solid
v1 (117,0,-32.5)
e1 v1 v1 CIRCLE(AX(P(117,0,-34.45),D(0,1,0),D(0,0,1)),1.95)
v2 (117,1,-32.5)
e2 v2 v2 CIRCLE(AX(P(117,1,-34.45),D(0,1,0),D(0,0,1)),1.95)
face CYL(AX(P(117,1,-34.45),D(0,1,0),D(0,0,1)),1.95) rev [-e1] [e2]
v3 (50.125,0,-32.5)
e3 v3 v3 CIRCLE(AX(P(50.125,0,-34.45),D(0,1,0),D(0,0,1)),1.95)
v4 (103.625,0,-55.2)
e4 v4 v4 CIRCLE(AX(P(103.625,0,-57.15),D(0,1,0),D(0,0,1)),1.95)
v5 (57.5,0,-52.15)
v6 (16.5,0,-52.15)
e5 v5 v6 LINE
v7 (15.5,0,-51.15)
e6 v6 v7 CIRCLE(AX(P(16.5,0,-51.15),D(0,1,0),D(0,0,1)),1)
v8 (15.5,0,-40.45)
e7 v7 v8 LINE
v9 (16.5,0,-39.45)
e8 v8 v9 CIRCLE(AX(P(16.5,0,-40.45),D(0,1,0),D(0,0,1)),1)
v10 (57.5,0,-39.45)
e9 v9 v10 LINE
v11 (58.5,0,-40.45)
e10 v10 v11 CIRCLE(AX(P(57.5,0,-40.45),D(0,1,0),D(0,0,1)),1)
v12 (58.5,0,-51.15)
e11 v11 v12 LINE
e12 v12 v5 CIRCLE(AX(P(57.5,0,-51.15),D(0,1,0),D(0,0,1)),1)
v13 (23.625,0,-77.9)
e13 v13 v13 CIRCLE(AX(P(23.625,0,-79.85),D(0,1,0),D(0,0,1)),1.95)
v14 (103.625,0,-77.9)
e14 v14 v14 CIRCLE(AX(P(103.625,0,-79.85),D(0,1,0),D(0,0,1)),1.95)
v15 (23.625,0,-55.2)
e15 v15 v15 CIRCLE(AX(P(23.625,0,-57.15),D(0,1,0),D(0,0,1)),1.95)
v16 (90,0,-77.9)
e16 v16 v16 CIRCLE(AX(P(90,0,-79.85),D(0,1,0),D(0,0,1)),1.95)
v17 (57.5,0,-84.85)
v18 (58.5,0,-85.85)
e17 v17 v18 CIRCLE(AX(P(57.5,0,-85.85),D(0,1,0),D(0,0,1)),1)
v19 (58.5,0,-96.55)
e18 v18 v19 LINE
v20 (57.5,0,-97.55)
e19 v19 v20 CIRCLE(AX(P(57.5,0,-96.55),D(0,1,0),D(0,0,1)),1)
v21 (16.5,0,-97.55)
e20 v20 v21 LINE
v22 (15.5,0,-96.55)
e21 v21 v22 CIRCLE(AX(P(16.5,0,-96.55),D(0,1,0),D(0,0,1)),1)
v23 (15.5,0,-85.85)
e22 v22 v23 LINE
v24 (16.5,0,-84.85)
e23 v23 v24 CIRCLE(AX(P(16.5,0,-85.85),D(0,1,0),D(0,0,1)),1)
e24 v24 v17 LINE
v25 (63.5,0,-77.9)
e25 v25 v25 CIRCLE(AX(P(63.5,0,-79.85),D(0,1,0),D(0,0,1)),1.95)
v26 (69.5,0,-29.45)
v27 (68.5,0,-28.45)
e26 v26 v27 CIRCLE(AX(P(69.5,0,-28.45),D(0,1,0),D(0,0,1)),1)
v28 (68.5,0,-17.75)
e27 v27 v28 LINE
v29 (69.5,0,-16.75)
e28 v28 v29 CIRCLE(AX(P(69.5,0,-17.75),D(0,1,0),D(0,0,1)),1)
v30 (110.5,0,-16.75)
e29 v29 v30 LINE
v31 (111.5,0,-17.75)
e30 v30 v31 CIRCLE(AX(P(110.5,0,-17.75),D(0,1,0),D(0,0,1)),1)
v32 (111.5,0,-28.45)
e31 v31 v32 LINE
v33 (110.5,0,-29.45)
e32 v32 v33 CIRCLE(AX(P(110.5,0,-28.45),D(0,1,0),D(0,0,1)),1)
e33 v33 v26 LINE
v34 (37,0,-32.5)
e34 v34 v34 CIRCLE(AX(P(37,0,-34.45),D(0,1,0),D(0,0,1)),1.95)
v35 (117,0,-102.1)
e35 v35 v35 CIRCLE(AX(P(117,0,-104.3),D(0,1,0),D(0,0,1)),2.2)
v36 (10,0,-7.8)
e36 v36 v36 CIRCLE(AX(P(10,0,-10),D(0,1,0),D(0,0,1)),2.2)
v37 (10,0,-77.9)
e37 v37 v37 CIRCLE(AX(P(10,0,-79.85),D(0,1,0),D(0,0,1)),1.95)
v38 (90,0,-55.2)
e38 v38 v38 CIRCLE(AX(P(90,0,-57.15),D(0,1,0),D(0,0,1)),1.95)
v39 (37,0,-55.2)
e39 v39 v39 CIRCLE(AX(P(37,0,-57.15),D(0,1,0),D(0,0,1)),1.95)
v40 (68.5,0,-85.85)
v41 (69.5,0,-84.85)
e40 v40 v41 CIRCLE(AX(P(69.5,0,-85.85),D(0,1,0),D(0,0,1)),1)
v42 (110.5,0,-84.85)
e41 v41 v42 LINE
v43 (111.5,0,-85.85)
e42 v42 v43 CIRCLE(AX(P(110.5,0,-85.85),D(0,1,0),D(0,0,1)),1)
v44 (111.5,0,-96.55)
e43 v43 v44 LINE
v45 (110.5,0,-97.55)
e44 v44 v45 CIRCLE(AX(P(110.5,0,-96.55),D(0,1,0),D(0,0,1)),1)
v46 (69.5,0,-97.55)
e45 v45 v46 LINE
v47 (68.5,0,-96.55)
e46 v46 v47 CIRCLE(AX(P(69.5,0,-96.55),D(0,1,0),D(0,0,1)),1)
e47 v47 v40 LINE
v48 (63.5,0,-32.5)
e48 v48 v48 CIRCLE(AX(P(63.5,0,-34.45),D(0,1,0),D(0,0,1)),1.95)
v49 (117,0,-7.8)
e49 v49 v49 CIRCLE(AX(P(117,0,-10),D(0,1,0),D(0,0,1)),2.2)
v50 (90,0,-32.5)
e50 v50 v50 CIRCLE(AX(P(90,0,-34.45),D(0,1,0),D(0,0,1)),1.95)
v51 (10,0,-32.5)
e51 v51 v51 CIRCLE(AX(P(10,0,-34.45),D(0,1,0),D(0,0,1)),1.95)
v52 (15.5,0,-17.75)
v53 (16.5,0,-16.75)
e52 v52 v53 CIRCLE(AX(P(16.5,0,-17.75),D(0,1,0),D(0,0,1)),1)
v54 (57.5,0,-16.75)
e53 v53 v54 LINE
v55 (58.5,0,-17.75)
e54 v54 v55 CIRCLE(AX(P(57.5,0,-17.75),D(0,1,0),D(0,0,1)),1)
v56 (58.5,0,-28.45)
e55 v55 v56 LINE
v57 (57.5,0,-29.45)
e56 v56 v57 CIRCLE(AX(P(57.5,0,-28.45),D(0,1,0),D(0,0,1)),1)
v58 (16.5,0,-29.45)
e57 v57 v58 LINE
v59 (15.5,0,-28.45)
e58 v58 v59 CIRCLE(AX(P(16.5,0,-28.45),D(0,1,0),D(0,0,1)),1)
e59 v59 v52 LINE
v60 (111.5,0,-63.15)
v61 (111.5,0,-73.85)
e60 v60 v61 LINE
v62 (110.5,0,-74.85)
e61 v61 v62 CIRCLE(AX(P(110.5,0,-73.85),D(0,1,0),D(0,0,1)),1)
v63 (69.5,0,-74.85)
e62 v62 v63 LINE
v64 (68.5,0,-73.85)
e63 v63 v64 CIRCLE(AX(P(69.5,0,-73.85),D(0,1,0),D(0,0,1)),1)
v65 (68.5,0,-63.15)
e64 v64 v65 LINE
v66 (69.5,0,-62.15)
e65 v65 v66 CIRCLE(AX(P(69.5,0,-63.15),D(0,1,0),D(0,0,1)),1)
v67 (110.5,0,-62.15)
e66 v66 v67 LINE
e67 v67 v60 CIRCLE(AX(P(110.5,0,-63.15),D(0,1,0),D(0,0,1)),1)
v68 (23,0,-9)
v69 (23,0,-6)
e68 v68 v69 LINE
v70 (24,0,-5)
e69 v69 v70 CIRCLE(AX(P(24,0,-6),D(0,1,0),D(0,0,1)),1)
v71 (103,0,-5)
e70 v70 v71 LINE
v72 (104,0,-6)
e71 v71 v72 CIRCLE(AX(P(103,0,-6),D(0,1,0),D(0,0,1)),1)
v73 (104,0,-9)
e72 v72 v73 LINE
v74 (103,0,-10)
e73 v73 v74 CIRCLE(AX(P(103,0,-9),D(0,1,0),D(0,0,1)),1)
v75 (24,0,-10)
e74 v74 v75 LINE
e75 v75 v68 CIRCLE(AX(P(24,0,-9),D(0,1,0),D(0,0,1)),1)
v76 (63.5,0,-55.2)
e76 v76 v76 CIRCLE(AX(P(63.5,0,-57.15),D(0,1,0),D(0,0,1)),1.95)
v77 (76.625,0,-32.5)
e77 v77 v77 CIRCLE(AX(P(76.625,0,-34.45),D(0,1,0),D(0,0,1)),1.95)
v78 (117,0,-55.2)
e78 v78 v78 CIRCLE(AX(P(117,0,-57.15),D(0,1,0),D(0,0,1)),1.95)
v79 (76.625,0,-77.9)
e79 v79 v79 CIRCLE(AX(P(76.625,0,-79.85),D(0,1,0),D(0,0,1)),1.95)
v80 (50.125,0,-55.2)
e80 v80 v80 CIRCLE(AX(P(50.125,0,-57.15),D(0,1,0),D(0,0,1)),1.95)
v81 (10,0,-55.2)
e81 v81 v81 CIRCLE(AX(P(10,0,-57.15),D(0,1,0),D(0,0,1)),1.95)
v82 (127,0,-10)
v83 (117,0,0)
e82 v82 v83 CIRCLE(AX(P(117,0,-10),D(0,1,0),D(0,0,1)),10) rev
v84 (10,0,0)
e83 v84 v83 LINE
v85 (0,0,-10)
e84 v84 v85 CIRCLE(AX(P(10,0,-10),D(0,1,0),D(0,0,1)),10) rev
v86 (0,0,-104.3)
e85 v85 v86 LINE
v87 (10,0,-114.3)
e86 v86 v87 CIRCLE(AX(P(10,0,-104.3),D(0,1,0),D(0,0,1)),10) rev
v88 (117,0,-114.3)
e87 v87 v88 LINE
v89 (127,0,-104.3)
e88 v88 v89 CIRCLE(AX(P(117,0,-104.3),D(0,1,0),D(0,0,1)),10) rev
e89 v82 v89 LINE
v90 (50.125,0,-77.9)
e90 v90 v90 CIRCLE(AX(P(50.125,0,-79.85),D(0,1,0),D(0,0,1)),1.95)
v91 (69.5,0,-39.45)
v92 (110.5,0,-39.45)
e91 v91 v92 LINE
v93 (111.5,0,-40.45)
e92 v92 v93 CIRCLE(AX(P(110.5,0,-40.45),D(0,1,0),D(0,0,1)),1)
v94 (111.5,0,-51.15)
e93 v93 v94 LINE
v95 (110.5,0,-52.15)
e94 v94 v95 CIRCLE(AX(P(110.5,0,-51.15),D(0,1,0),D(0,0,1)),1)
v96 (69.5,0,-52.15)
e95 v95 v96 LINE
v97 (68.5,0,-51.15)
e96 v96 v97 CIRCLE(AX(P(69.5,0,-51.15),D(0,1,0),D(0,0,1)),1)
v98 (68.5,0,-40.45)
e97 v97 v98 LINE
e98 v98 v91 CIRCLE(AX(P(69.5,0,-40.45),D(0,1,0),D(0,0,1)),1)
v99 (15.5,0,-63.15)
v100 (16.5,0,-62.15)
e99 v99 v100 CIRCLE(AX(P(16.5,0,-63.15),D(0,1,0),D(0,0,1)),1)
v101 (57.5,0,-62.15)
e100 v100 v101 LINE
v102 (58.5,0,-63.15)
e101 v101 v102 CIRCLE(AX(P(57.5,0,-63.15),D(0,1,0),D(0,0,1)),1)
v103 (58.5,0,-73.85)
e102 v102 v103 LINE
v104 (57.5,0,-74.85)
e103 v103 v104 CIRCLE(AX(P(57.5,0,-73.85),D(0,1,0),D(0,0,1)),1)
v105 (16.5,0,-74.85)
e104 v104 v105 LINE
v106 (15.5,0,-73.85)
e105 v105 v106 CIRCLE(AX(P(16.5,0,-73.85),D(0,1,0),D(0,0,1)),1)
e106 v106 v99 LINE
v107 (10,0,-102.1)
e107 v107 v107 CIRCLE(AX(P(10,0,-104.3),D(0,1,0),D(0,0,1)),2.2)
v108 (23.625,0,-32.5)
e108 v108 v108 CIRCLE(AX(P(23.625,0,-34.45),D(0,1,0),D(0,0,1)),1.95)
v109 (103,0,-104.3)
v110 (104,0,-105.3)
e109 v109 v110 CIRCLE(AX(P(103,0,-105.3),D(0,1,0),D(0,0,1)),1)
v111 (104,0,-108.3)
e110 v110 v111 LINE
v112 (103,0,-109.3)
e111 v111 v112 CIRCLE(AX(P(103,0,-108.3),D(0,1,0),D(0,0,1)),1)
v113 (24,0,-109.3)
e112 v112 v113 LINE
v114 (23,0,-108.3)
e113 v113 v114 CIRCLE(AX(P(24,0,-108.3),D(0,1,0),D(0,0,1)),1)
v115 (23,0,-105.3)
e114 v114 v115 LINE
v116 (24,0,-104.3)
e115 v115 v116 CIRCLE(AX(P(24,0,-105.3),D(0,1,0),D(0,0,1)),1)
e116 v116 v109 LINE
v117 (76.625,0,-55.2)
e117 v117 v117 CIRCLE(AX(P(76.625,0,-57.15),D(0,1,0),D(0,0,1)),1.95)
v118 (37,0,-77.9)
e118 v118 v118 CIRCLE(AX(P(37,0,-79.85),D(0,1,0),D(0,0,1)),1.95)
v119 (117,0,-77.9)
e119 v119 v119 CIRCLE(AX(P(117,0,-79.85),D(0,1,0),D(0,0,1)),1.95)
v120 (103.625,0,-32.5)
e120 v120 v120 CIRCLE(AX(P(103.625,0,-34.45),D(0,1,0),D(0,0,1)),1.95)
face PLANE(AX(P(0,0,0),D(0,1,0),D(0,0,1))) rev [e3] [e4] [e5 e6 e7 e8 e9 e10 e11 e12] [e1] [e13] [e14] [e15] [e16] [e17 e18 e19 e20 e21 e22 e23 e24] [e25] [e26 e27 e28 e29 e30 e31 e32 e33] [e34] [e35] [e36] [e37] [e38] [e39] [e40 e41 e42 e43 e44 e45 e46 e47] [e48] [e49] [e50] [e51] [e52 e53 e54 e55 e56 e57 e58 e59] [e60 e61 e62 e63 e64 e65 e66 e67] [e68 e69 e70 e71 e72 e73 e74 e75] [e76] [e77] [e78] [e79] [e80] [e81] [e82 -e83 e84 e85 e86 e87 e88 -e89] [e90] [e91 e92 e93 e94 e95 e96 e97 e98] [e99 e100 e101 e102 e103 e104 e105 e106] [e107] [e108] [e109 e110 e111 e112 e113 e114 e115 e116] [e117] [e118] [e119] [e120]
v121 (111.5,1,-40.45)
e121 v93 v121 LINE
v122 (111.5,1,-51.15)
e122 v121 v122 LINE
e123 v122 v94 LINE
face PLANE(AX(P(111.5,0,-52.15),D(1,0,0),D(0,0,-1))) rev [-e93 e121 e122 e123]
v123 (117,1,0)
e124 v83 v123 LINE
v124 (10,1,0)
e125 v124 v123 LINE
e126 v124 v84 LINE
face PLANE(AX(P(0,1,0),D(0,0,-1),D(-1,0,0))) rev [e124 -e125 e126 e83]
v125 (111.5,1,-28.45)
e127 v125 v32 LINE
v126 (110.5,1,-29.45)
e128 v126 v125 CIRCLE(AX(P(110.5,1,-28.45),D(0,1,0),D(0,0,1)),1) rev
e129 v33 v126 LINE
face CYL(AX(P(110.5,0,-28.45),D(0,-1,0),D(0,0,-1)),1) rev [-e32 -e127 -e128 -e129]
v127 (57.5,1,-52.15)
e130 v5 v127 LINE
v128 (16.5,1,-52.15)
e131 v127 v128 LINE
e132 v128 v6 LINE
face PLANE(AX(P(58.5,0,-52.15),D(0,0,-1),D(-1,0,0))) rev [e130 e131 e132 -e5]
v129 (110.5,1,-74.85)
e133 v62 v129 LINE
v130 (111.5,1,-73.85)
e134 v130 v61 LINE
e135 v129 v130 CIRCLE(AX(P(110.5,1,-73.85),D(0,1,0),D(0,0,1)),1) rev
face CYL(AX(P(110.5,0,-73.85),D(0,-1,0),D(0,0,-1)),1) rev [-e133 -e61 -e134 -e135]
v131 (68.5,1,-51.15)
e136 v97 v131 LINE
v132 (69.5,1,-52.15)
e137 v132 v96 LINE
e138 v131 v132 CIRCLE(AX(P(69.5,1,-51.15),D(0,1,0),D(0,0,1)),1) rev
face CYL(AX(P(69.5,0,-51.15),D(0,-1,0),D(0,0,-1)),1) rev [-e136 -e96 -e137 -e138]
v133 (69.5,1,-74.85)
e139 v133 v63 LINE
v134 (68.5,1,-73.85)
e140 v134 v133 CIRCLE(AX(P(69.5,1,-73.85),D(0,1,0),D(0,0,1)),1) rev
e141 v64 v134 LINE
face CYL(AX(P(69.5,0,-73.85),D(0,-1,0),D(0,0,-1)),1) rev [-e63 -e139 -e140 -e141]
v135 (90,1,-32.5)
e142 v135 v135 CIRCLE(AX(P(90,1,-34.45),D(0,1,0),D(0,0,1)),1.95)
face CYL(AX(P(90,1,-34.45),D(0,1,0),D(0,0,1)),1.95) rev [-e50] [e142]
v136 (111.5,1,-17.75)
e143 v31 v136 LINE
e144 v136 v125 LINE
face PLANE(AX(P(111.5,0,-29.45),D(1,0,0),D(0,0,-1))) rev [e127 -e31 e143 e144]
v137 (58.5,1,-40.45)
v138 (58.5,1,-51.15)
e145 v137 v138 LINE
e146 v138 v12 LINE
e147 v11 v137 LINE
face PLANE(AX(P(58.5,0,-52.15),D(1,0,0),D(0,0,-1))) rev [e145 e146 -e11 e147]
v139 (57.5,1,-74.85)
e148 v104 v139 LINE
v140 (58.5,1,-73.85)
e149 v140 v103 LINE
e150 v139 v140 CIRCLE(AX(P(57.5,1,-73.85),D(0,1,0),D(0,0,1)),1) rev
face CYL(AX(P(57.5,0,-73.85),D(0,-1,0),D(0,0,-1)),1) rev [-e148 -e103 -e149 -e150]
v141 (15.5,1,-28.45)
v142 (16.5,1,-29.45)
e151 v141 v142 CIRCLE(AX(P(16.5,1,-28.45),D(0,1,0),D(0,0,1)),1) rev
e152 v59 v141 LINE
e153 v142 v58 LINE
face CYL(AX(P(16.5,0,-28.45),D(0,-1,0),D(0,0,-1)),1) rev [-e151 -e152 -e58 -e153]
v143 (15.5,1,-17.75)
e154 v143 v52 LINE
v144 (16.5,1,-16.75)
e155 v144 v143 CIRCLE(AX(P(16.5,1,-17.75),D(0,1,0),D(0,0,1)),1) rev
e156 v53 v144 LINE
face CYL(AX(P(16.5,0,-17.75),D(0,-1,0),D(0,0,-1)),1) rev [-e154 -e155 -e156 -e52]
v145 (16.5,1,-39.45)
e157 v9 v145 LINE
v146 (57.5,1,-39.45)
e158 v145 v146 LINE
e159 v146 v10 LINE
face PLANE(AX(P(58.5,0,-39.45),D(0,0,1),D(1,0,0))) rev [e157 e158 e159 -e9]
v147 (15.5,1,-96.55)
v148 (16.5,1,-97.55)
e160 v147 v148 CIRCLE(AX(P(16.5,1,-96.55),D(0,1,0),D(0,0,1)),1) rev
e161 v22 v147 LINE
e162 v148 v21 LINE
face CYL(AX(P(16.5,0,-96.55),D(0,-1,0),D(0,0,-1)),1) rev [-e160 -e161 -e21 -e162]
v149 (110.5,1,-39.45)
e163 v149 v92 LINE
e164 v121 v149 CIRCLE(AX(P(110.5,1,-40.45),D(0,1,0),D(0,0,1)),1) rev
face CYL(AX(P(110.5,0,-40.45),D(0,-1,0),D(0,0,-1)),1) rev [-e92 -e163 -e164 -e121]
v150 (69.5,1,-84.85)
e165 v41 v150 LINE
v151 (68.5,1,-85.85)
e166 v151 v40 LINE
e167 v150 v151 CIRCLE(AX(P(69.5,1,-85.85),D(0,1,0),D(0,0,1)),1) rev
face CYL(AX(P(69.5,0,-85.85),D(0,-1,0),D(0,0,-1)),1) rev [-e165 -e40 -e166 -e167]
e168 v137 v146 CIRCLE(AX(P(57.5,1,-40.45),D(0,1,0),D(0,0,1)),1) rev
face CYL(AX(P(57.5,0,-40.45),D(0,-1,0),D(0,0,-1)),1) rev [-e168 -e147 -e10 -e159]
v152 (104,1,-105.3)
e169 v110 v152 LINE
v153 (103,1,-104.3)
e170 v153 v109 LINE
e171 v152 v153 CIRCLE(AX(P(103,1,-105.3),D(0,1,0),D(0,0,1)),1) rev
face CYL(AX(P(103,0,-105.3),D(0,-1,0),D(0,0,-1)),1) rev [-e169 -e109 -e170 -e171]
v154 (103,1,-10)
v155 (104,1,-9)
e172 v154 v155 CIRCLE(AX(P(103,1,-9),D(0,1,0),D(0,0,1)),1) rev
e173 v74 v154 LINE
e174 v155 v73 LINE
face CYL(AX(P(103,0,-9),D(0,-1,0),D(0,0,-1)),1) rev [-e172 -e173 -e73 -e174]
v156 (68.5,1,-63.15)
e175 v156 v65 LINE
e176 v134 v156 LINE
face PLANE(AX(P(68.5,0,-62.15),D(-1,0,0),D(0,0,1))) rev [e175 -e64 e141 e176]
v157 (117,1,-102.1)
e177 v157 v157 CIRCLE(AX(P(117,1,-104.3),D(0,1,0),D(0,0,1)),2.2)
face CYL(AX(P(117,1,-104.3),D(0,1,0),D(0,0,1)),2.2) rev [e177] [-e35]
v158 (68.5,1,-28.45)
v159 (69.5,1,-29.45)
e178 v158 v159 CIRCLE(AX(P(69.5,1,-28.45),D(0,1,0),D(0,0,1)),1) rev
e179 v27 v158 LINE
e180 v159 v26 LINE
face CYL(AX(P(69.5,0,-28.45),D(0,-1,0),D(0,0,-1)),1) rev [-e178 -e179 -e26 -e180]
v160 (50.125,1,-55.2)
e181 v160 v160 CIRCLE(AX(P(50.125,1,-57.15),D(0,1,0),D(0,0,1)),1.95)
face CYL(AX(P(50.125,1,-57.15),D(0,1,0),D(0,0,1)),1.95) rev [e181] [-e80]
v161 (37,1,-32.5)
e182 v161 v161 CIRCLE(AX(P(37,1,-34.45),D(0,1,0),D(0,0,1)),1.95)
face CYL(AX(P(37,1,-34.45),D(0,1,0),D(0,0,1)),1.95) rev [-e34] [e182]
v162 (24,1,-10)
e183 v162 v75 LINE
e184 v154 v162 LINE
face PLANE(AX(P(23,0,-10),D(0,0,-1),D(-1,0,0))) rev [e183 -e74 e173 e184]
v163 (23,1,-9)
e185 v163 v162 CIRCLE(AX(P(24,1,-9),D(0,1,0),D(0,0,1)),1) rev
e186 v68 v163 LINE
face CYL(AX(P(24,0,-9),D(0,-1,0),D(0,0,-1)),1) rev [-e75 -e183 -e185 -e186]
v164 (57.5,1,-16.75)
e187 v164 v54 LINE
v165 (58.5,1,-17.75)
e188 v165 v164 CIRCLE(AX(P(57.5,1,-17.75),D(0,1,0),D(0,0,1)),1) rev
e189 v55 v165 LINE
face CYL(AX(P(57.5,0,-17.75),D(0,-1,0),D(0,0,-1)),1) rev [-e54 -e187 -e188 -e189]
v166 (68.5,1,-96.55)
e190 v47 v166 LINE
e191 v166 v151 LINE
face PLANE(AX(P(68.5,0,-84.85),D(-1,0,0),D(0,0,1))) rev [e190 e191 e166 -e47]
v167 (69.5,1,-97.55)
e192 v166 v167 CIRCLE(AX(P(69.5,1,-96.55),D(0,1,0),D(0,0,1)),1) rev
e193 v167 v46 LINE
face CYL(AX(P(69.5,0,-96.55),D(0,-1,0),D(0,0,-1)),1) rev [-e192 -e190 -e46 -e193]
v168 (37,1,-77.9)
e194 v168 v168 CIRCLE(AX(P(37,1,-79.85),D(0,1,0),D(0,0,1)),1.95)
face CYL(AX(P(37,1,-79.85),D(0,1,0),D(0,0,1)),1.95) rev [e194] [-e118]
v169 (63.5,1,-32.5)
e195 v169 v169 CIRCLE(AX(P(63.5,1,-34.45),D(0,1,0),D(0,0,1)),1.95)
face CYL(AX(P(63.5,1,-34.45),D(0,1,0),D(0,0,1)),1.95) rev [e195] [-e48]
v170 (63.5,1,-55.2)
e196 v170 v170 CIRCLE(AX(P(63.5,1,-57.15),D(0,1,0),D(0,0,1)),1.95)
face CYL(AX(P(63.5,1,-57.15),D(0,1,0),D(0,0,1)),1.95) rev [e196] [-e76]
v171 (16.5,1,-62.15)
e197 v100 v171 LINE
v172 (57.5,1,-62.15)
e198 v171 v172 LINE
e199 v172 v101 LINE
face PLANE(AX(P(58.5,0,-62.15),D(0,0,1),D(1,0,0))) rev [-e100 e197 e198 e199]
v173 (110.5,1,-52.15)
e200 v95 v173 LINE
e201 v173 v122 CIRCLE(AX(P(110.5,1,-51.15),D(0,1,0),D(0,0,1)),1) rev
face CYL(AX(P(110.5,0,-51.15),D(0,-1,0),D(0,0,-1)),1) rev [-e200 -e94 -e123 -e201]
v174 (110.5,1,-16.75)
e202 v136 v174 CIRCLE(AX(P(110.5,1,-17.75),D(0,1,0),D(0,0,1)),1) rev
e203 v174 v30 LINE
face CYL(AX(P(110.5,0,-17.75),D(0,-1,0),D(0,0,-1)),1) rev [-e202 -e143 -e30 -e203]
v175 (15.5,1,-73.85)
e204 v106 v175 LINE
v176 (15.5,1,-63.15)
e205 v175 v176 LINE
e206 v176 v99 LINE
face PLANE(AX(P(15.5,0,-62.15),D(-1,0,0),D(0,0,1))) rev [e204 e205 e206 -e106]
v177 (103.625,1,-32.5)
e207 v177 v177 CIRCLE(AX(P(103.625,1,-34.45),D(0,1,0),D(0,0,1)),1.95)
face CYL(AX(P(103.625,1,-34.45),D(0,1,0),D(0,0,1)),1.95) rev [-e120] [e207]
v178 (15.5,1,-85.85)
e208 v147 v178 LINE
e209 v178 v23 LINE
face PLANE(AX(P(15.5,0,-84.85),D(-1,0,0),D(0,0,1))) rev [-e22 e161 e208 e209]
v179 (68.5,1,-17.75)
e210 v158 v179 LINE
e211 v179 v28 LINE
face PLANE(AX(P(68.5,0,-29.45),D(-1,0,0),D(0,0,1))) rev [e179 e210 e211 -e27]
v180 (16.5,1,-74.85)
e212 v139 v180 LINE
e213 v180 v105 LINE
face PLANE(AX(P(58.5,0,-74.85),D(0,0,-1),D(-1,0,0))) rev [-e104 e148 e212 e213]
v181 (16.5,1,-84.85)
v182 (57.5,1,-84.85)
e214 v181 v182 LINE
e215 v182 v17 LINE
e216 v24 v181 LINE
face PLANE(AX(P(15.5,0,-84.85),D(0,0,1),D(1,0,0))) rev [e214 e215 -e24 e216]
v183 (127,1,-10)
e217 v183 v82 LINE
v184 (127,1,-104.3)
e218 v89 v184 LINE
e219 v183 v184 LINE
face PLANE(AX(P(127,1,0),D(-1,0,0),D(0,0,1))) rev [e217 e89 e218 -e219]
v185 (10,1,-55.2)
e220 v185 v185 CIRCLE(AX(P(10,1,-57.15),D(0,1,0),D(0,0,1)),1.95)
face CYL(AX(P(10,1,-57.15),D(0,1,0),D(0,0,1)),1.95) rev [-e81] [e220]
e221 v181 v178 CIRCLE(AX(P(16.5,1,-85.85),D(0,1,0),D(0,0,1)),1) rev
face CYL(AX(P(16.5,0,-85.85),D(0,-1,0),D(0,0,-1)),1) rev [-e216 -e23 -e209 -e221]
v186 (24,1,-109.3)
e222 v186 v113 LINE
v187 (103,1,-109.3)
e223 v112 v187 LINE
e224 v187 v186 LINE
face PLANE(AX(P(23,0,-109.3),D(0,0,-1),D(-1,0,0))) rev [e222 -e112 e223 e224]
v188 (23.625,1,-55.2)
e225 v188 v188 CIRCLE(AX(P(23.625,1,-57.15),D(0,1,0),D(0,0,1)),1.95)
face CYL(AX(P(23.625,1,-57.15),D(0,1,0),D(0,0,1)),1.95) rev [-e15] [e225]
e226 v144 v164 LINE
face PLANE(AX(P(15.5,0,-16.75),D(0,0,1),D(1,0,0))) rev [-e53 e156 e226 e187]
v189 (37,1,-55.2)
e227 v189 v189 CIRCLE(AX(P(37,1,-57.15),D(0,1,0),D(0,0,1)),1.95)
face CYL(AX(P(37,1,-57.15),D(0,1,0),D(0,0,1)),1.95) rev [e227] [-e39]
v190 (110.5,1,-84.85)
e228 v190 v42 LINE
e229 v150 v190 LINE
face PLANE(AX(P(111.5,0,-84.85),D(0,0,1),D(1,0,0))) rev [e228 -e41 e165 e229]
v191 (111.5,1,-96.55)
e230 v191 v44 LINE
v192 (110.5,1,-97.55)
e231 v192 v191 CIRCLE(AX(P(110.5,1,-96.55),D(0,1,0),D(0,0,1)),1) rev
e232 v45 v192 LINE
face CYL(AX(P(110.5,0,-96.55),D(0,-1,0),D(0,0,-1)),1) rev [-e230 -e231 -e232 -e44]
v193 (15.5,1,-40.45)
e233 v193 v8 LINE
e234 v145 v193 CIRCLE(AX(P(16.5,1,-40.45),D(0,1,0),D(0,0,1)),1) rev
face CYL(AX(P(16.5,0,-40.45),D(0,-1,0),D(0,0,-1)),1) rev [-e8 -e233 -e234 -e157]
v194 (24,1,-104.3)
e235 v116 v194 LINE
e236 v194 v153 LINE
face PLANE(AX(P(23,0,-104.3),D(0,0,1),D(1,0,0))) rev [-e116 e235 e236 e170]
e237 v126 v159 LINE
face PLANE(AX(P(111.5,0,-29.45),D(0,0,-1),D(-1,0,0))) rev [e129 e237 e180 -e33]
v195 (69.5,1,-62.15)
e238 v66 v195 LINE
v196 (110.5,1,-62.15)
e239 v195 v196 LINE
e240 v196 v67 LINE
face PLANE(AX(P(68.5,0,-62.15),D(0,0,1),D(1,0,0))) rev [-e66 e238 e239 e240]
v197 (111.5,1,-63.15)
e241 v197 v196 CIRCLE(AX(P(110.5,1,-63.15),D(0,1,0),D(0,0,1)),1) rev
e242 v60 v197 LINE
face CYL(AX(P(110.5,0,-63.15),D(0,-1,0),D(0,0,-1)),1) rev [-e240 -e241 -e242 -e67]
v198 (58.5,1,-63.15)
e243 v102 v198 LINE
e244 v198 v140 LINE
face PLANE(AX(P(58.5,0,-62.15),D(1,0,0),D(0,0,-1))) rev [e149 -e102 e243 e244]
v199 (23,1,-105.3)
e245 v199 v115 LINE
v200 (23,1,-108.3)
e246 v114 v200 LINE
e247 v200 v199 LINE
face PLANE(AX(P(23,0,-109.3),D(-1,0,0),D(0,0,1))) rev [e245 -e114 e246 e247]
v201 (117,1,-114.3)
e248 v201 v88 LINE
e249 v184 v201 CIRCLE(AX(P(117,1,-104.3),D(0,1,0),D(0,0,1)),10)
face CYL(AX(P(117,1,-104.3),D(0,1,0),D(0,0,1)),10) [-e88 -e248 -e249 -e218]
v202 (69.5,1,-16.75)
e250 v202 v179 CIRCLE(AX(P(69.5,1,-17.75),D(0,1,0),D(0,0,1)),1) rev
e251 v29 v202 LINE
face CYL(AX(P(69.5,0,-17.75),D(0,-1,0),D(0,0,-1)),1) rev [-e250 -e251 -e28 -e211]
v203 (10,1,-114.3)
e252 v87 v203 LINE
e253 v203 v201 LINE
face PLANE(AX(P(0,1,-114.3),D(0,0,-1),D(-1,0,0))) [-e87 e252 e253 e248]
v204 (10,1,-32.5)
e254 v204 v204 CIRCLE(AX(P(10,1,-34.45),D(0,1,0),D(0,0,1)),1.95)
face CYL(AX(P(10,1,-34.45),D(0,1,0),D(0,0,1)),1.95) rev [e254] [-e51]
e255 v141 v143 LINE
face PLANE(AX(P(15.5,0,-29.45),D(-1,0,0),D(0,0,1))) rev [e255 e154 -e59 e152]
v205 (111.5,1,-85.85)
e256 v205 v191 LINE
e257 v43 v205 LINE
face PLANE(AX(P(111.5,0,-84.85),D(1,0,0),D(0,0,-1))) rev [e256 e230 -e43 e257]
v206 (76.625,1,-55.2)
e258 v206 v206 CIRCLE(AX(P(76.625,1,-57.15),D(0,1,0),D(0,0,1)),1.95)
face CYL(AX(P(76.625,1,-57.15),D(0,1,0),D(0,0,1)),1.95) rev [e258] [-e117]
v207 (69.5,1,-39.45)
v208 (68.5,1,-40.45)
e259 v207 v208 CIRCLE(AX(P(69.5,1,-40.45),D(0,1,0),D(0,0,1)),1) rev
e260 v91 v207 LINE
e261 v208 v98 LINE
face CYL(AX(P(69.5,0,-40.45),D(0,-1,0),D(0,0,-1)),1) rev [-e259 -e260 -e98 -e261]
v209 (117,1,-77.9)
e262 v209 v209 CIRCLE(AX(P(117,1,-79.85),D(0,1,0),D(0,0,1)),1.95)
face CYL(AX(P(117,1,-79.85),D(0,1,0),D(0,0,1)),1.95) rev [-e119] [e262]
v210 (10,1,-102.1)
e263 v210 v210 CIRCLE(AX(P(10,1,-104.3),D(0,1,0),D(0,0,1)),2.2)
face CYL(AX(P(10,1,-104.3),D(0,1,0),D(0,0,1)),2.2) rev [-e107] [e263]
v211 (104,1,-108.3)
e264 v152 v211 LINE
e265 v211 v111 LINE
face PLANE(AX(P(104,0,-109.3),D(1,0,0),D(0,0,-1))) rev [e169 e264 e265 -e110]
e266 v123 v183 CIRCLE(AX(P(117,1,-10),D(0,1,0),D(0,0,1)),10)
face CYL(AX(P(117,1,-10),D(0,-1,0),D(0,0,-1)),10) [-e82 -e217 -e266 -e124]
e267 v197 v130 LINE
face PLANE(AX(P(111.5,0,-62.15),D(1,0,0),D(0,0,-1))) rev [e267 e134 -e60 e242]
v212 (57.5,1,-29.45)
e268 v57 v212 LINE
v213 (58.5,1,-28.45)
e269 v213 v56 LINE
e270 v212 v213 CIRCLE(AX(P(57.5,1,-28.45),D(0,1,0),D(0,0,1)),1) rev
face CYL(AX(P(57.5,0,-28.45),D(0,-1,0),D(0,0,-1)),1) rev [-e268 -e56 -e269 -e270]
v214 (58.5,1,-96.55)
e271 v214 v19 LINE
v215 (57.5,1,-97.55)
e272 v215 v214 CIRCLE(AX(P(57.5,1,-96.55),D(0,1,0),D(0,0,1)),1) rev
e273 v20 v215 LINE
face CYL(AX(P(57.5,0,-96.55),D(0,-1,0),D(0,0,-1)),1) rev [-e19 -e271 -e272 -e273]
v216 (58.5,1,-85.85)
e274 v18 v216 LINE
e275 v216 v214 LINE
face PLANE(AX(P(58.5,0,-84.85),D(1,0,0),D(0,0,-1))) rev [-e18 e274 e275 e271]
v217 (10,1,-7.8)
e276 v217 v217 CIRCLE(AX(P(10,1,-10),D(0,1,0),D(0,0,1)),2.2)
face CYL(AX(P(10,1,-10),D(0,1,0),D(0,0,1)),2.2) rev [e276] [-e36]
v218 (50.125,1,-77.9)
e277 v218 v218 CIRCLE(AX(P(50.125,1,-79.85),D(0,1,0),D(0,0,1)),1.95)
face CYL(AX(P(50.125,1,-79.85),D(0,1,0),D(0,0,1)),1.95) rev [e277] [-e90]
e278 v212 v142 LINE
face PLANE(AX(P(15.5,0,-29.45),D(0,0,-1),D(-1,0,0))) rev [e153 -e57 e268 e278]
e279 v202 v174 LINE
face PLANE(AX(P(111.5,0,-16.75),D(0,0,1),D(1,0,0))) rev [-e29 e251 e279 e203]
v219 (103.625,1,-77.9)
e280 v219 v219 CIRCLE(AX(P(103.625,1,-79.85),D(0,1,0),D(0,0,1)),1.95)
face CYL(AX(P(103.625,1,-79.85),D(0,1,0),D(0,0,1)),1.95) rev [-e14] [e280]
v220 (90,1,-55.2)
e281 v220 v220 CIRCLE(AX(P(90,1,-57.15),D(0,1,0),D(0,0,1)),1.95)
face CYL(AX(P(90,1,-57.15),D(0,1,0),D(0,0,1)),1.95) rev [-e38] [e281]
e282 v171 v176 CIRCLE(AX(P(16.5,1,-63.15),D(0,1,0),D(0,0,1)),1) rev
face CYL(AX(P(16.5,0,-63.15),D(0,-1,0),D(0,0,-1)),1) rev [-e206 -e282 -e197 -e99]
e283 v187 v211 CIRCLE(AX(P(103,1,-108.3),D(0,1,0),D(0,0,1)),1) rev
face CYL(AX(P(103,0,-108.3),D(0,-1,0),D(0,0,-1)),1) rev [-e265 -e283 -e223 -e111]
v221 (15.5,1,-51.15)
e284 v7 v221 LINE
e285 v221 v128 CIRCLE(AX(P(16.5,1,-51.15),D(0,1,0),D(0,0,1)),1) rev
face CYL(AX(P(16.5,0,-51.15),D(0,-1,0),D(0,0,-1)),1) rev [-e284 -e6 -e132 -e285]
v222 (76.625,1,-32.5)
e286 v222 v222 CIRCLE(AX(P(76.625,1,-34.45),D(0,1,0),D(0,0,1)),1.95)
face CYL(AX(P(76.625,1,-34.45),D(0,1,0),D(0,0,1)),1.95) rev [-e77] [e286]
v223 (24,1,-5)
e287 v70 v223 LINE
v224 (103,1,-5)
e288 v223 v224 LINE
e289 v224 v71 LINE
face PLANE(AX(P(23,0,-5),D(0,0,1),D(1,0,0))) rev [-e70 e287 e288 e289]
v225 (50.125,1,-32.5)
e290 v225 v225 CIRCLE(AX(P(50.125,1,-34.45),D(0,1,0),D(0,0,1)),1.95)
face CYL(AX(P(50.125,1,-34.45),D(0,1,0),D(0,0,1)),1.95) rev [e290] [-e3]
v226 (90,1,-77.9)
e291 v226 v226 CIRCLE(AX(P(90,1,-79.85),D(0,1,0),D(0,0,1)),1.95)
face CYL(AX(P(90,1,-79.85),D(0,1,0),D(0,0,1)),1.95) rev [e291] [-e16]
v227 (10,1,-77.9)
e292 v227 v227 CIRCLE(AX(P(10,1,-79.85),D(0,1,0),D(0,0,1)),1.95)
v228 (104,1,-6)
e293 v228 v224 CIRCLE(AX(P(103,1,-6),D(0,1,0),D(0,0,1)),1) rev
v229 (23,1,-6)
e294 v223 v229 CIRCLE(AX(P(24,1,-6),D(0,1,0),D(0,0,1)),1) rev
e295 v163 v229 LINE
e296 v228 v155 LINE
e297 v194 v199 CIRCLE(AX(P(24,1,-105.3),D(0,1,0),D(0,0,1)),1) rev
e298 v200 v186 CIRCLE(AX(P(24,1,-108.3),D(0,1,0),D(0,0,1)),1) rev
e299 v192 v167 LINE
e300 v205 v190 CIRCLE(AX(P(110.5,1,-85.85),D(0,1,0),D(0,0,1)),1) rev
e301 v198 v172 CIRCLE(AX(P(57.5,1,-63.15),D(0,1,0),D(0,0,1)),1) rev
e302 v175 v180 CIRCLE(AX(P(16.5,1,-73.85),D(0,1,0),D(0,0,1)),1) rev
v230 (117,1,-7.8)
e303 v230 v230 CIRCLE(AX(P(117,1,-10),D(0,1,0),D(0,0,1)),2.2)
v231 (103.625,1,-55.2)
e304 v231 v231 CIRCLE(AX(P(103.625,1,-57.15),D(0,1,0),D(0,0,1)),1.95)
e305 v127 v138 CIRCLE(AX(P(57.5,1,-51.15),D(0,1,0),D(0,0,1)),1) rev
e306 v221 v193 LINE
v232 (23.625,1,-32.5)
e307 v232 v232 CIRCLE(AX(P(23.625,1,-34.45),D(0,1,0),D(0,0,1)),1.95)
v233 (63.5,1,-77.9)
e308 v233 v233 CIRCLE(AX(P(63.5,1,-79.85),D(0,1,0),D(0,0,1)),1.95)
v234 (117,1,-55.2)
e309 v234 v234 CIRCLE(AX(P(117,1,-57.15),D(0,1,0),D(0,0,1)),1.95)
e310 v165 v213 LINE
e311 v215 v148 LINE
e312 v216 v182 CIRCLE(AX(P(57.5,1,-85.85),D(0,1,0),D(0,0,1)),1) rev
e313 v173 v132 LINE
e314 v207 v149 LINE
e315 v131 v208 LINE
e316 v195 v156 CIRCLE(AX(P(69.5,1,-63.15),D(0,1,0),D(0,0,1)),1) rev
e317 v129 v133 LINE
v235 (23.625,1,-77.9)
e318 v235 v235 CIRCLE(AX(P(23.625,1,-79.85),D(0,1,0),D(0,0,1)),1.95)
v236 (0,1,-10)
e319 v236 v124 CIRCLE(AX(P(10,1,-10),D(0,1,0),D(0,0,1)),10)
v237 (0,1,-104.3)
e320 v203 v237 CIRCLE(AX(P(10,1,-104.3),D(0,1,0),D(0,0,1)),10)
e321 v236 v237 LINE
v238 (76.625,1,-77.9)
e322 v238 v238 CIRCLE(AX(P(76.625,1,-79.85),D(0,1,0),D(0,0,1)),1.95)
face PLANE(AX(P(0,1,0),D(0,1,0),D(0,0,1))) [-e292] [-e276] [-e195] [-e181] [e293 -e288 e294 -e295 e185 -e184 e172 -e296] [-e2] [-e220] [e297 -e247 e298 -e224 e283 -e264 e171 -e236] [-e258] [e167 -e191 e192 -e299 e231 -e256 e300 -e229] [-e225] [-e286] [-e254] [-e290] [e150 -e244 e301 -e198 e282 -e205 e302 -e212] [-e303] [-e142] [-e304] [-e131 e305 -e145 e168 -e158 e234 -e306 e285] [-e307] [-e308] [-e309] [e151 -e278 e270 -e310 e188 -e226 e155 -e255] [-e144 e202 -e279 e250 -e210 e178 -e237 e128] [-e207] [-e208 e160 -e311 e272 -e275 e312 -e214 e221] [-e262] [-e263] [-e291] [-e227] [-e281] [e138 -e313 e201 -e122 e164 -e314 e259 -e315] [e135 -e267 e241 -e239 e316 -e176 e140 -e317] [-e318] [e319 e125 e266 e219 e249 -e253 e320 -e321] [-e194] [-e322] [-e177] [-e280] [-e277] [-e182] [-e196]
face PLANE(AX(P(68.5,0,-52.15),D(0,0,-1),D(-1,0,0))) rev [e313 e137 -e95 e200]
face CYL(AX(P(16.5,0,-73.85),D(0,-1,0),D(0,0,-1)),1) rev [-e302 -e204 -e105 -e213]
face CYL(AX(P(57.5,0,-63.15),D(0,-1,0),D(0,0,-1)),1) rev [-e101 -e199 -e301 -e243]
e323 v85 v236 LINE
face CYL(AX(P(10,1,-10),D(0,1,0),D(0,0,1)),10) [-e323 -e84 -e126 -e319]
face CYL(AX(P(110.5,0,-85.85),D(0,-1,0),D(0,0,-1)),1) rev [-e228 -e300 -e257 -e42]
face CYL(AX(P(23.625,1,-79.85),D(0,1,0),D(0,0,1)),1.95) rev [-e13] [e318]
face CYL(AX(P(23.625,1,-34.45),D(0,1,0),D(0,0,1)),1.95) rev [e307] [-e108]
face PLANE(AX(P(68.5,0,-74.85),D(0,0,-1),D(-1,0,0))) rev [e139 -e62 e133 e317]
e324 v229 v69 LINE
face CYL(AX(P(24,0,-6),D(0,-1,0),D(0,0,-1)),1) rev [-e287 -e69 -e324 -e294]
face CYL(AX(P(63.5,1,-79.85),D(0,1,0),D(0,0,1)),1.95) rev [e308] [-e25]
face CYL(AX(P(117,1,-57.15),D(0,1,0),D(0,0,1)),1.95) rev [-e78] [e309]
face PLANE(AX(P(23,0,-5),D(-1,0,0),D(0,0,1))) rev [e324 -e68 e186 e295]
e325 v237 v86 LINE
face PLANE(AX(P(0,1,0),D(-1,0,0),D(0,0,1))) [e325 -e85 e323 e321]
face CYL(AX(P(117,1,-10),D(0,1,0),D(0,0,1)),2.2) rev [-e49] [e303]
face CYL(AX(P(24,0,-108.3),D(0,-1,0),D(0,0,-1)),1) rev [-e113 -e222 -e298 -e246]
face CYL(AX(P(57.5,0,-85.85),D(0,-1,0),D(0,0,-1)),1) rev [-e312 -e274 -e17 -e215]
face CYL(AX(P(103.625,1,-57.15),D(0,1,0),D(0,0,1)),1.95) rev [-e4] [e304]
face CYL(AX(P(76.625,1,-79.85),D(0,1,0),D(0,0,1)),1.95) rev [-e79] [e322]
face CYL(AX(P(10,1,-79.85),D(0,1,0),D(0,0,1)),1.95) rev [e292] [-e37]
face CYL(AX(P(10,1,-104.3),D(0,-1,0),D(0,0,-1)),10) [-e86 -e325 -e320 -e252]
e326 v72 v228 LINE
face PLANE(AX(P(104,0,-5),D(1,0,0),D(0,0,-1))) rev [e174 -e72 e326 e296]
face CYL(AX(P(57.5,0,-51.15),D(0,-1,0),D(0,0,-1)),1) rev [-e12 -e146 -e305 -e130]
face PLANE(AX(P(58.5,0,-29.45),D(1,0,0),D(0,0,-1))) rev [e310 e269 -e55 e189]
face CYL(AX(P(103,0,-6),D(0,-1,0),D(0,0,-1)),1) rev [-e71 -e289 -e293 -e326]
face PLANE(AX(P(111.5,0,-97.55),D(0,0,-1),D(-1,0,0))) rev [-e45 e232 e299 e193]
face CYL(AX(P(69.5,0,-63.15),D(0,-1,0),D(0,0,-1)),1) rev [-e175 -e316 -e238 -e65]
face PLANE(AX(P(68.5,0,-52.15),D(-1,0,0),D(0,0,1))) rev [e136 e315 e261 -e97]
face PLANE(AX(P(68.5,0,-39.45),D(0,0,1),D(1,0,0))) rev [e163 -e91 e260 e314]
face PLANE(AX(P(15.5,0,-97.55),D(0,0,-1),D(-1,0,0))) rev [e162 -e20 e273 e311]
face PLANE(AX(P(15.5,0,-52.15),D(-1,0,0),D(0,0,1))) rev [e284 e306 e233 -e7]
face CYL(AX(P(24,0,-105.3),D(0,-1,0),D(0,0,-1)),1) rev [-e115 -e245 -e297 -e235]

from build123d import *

# Parameters (mm, degrees)
SKETCH2_W                          = 127
SKETCH2_H                          = 114.3
BOSS_EXTRUDE1_DEPTH                = 1
FILLET1_R                          = 10
F_4_4_4_4_DIAMETER_HOLE1_D         = 4.4
CUT_EXTRUDE1_DEPTH                 = 171.863951728
CUT_EXTRUDE1_DEPTH_BACK            = 171.863951728
SKETCH5_W                          = 43
SKETCH5_H                          = 12.7
CUT_EXTRUDE2_DEPTH                 = 171.863951728
CUT_EXTRUDE2_DEPTH_BACK            = 171.863951728
SKETCH6_W                          = 81
SKETCH6_H                          = 5
F_3_9_3_9_DIAMETER_HOLE1_OUTLINE_R = 1.95
F_3_9_3_9_DIAMETER_HOLE1_DEPTH     = 1
FILLET2_R                          = 1


# Read off the part's stored shape, not the designer's step: Ø3.9 (3.9) Diameter Hole1
with BuildPart() as part:
    # Sketch2 → Boss-Extrude1 (new body)
    with BuildSketch(Plane(origin=(0, 0, 0), x_dir=(1, 0, 0), z_dir=(0, 1, 0))):
        with Locations((63.5, 57.15)):
            Rectangle(SKETCH2_W, SKETCH2_H)
    extrude(amount=BOSS_EXTRUDE1_DEPTH)

    # Fillet1
    fillet1_edges = [part.edges().sort_by_distance(p)[0] for p in [
        (0, 0.5, 0),
        (0, 0.5, -114.3),
        (127, 0.5, -114.3),
        (127, 0.5, 0),
    ]]
    fillet(fillet1_edges, radius=FILLET1_R)

    # Ø4.4 (4.4) Diameter Hole1 (through all)
    with Locations(Plane(origin=(0, 1, 0), x_dir=(1, 0, 0), z_dir=(0, 1, 0))):
        with Locations((10, 104.3), (117, 104.3), (10, 10), (117, 10)):
            Hole(F_4_4_4_4_DIAMETER_HOLE1_D / 2)

    # Sketch5 → Cut-Extrude1 (cut, two sides: drawn at the far end of the back side and taken through both)
    with BuildSketch(Plane(origin=(0, 1, 0), x_dir=(1, 0, 0), z_dir=(0, 1, 0)).offset(-CUT_EXTRUDE1_DEPTH_BACK)):
        with Locations((90, 68.5)):
            Rectangle(SKETCH5_W, SKETCH5_H)
        with Locations((37, 68.5)):
            Rectangle(SKETCH5_W, SKETCH5_H)
        with Locations((37, 91.2)):
            Rectangle(SKETCH5_W, SKETCH5_H)
        with Locations((90, 91.2)):
            Rectangle(SKETCH5_W, SKETCH5_H)
        with Locations((90, 23.1)):
            Rectangle(SKETCH5_W, SKETCH5_H)
        with Locations((90, 45.8)):
            Rectangle(SKETCH5_W, SKETCH5_H)
        with Locations((37, 45.8)):
            Rectangle(SKETCH5_W, SKETCH5_H)
        with Locations((37, 23.1)):
            Rectangle(SKETCH5_W, SKETCH5_H)
    extrude(amount=CUT_EXTRUDE1_DEPTH + CUT_EXTRUDE1_DEPTH_BACK, mode=Mode.SUBTRACT)

    # Sketch6 → Cut-Extrude2 (cut, two sides: drawn at the far end of the back side and taken through both)
    with BuildSketch(Plane(origin=(0, 1, 0), x_dir=(1, 0, 0), z_dir=(0, 1, 0)).offset(-CUT_EXTRUDE2_DEPTH_BACK)):
        with Locations((63.5, 106.8)):
            Rectangle(SKETCH6_W, SKETCH6_H)
        with Locations((63.5, 7.5)):
            Rectangle(SKETCH6_W, SKETCH6_H)
    extrude(amount=CUT_EXTRUDE2_DEPTH + CUT_EXTRUDE2_DEPTH_BACK, mode=Mode.SUBTRACT)

    # Ø3.9 (3.9) Diameter Hole1 outline → Ø3.9 (3.9) Diameter Hole1 (cut)
    with BuildSketch(Plane(origin=(0, 0, 0), x_dir=(1, 0, 0), z_dir=(0, 1, 0))):
        with Locations((117, 34.45)):
            Circle(F_3_9_3_9_DIAMETER_HOLE1_OUTLINE_R)
        with Locations((103.625, 34.45)):
            Circle(F_3_9_3_9_DIAMETER_HOLE1_OUTLINE_R)
        with Locations((76.625, 34.45)):
            Circle(F_3_9_3_9_DIAMETER_HOLE1_OUTLINE_R)
        with Locations((90, 34.45)):
            Circle(F_3_9_3_9_DIAMETER_HOLE1_OUTLINE_R)
        with Locations((50.125, 34.45)):
            Circle(F_3_9_3_9_DIAMETER_HOLE1_OUTLINE_R)
        with Locations((63.5, 34.45)):
            Circle(F_3_9_3_9_DIAMETER_HOLE1_OUTLINE_R)
        with Locations((23.625, 34.45)):
            Circle(F_3_9_3_9_DIAMETER_HOLE1_OUTLINE_R)
        with Locations((10, 34.45)):
            Circle(F_3_9_3_9_DIAMETER_HOLE1_OUTLINE_R)
        with Locations((37, 34.45)):
            Circle(F_3_9_3_9_DIAMETER_HOLE1_OUTLINE_R)
        with Locations((10, 57.15)):
            Circle(F_3_9_3_9_DIAMETER_HOLE1_OUTLINE_R)
        with Locations((23.625, 57.15)):
            Circle(F_3_9_3_9_DIAMETER_HOLE1_OUTLINE_R)
        with Locations((37, 57.15)):
            Circle(F_3_9_3_9_DIAMETER_HOLE1_OUTLINE_R)
        with Locations((50.125, 57.15)):
            Circle(F_3_9_3_9_DIAMETER_HOLE1_OUTLINE_R)
        with Locations((63.5, 57.15)):
            Circle(F_3_9_3_9_DIAMETER_HOLE1_OUTLINE_R)
        with Locations((76.625, 57.15)):
            Circle(F_3_9_3_9_DIAMETER_HOLE1_OUTLINE_R)
        with Locations((90, 57.15)):
            Circle(F_3_9_3_9_DIAMETER_HOLE1_OUTLINE_R)
        with Locations((103.625, 57.15)):
            Circle(F_3_9_3_9_DIAMETER_HOLE1_OUTLINE_R)
        with Locations((117, 79.85)):
            Circle(F_3_9_3_9_DIAMETER_HOLE1_OUTLINE_R)
        with Locations((103.625, 79.85)):
            Circle(F_3_9_3_9_DIAMETER_HOLE1_OUTLINE_R)
        with Locations((117, 57.15)):
            Circle(F_3_9_3_9_DIAMETER_HOLE1_OUTLINE_R)
        with Locations((76.625, 79.85)):
            Circle(F_3_9_3_9_DIAMETER_HOLE1_OUTLINE_R)
        with Locations((90, 79.85)):
            Circle(F_3_9_3_9_DIAMETER_HOLE1_OUTLINE_R)
        with Locations((50.125, 79.85)):
            Circle(F_3_9_3_9_DIAMETER_HOLE1_OUTLINE_R)
        with Locations((63.5, 79.85)):
            Circle(F_3_9_3_9_DIAMETER_HOLE1_OUTLINE_R)
        with Locations((23.625, 79.85)):
            Circle(F_3_9_3_9_DIAMETER_HOLE1_OUTLINE_R)
        with Locations((37, 79.85)):
            Circle(F_3_9_3_9_DIAMETER_HOLE1_OUTLINE_R)
        with Locations((10, 79.85)):
            Circle(F_3_9_3_9_DIAMETER_HOLE1_OUTLINE_R)
    extrude(amount=F_3_9_3_9_DIAMETER_HOLE1_DEPTH, mode=Mode.SUBTRACT)

    # Fillet2
    fillet2_edges = [part.edges().sort_by_distance(p)[0] for p in [
        (111.5, 0.5, -97.55),
        (111.5, 0.5, -84.85),
        (68.5, 0.5, -84.85),
        (68.5, 0.5, -97.55),
        (68.5, 0.5, -62.15),
        (68.5, 0.5, -74.85),
        (111.5, 0.5, -74.85),
        (111.5, 0.5, -62.15),
        (15.5, 0.5, -84.85),
        (15.5, 0.5, -97.55),
        (58.5, 0.5, -97.55),
        (58.5, 0.5, -84.85),
        (68.5, 0.5, -52.15),
        (111.5, 0.5, -52.15),
        (111.5, 0.5, -39.45),
        (68.5, 0.5, -39.45),
        (58.5, 0.5, -52.15),
        (58.5, 0.5, -39.45),
        (15.5, 0.5, -39.45),
        (15.5, 0.5, -52.15),
        (15.5, 0.5, -16.75),
        (15.5, 0.5, -29.45),
        (58.5, 0.5, -29.45),
        (58.5, 0.5, -16.75),
        (58.5, 0.5, -74.85),
        (58.5, 0.5, -62.15),
        (15.5, 0.5, -62.15),
        (15.5, 0.5, -74.85),
        (23, 0.5, -104.3),
        (23, 0.5, -109.3),
        (104, 0.5, -109.3),
        (104, 0.5, -104.3),
        (23, 0.5, -5),
        (23, 0.5, -10),
        (104, 0.5, -10),
        (104, 0.5, -5),
        (68.5, 0.5, -29.45),
        (111.5, 0.5, -29.45),
        (111.5, 0.5, -16.75),
        (68.5, 0.5, -16.75),
    ]]
    fillet(fillet2_edges, radius=FILLET2_R)


solid = part.part
